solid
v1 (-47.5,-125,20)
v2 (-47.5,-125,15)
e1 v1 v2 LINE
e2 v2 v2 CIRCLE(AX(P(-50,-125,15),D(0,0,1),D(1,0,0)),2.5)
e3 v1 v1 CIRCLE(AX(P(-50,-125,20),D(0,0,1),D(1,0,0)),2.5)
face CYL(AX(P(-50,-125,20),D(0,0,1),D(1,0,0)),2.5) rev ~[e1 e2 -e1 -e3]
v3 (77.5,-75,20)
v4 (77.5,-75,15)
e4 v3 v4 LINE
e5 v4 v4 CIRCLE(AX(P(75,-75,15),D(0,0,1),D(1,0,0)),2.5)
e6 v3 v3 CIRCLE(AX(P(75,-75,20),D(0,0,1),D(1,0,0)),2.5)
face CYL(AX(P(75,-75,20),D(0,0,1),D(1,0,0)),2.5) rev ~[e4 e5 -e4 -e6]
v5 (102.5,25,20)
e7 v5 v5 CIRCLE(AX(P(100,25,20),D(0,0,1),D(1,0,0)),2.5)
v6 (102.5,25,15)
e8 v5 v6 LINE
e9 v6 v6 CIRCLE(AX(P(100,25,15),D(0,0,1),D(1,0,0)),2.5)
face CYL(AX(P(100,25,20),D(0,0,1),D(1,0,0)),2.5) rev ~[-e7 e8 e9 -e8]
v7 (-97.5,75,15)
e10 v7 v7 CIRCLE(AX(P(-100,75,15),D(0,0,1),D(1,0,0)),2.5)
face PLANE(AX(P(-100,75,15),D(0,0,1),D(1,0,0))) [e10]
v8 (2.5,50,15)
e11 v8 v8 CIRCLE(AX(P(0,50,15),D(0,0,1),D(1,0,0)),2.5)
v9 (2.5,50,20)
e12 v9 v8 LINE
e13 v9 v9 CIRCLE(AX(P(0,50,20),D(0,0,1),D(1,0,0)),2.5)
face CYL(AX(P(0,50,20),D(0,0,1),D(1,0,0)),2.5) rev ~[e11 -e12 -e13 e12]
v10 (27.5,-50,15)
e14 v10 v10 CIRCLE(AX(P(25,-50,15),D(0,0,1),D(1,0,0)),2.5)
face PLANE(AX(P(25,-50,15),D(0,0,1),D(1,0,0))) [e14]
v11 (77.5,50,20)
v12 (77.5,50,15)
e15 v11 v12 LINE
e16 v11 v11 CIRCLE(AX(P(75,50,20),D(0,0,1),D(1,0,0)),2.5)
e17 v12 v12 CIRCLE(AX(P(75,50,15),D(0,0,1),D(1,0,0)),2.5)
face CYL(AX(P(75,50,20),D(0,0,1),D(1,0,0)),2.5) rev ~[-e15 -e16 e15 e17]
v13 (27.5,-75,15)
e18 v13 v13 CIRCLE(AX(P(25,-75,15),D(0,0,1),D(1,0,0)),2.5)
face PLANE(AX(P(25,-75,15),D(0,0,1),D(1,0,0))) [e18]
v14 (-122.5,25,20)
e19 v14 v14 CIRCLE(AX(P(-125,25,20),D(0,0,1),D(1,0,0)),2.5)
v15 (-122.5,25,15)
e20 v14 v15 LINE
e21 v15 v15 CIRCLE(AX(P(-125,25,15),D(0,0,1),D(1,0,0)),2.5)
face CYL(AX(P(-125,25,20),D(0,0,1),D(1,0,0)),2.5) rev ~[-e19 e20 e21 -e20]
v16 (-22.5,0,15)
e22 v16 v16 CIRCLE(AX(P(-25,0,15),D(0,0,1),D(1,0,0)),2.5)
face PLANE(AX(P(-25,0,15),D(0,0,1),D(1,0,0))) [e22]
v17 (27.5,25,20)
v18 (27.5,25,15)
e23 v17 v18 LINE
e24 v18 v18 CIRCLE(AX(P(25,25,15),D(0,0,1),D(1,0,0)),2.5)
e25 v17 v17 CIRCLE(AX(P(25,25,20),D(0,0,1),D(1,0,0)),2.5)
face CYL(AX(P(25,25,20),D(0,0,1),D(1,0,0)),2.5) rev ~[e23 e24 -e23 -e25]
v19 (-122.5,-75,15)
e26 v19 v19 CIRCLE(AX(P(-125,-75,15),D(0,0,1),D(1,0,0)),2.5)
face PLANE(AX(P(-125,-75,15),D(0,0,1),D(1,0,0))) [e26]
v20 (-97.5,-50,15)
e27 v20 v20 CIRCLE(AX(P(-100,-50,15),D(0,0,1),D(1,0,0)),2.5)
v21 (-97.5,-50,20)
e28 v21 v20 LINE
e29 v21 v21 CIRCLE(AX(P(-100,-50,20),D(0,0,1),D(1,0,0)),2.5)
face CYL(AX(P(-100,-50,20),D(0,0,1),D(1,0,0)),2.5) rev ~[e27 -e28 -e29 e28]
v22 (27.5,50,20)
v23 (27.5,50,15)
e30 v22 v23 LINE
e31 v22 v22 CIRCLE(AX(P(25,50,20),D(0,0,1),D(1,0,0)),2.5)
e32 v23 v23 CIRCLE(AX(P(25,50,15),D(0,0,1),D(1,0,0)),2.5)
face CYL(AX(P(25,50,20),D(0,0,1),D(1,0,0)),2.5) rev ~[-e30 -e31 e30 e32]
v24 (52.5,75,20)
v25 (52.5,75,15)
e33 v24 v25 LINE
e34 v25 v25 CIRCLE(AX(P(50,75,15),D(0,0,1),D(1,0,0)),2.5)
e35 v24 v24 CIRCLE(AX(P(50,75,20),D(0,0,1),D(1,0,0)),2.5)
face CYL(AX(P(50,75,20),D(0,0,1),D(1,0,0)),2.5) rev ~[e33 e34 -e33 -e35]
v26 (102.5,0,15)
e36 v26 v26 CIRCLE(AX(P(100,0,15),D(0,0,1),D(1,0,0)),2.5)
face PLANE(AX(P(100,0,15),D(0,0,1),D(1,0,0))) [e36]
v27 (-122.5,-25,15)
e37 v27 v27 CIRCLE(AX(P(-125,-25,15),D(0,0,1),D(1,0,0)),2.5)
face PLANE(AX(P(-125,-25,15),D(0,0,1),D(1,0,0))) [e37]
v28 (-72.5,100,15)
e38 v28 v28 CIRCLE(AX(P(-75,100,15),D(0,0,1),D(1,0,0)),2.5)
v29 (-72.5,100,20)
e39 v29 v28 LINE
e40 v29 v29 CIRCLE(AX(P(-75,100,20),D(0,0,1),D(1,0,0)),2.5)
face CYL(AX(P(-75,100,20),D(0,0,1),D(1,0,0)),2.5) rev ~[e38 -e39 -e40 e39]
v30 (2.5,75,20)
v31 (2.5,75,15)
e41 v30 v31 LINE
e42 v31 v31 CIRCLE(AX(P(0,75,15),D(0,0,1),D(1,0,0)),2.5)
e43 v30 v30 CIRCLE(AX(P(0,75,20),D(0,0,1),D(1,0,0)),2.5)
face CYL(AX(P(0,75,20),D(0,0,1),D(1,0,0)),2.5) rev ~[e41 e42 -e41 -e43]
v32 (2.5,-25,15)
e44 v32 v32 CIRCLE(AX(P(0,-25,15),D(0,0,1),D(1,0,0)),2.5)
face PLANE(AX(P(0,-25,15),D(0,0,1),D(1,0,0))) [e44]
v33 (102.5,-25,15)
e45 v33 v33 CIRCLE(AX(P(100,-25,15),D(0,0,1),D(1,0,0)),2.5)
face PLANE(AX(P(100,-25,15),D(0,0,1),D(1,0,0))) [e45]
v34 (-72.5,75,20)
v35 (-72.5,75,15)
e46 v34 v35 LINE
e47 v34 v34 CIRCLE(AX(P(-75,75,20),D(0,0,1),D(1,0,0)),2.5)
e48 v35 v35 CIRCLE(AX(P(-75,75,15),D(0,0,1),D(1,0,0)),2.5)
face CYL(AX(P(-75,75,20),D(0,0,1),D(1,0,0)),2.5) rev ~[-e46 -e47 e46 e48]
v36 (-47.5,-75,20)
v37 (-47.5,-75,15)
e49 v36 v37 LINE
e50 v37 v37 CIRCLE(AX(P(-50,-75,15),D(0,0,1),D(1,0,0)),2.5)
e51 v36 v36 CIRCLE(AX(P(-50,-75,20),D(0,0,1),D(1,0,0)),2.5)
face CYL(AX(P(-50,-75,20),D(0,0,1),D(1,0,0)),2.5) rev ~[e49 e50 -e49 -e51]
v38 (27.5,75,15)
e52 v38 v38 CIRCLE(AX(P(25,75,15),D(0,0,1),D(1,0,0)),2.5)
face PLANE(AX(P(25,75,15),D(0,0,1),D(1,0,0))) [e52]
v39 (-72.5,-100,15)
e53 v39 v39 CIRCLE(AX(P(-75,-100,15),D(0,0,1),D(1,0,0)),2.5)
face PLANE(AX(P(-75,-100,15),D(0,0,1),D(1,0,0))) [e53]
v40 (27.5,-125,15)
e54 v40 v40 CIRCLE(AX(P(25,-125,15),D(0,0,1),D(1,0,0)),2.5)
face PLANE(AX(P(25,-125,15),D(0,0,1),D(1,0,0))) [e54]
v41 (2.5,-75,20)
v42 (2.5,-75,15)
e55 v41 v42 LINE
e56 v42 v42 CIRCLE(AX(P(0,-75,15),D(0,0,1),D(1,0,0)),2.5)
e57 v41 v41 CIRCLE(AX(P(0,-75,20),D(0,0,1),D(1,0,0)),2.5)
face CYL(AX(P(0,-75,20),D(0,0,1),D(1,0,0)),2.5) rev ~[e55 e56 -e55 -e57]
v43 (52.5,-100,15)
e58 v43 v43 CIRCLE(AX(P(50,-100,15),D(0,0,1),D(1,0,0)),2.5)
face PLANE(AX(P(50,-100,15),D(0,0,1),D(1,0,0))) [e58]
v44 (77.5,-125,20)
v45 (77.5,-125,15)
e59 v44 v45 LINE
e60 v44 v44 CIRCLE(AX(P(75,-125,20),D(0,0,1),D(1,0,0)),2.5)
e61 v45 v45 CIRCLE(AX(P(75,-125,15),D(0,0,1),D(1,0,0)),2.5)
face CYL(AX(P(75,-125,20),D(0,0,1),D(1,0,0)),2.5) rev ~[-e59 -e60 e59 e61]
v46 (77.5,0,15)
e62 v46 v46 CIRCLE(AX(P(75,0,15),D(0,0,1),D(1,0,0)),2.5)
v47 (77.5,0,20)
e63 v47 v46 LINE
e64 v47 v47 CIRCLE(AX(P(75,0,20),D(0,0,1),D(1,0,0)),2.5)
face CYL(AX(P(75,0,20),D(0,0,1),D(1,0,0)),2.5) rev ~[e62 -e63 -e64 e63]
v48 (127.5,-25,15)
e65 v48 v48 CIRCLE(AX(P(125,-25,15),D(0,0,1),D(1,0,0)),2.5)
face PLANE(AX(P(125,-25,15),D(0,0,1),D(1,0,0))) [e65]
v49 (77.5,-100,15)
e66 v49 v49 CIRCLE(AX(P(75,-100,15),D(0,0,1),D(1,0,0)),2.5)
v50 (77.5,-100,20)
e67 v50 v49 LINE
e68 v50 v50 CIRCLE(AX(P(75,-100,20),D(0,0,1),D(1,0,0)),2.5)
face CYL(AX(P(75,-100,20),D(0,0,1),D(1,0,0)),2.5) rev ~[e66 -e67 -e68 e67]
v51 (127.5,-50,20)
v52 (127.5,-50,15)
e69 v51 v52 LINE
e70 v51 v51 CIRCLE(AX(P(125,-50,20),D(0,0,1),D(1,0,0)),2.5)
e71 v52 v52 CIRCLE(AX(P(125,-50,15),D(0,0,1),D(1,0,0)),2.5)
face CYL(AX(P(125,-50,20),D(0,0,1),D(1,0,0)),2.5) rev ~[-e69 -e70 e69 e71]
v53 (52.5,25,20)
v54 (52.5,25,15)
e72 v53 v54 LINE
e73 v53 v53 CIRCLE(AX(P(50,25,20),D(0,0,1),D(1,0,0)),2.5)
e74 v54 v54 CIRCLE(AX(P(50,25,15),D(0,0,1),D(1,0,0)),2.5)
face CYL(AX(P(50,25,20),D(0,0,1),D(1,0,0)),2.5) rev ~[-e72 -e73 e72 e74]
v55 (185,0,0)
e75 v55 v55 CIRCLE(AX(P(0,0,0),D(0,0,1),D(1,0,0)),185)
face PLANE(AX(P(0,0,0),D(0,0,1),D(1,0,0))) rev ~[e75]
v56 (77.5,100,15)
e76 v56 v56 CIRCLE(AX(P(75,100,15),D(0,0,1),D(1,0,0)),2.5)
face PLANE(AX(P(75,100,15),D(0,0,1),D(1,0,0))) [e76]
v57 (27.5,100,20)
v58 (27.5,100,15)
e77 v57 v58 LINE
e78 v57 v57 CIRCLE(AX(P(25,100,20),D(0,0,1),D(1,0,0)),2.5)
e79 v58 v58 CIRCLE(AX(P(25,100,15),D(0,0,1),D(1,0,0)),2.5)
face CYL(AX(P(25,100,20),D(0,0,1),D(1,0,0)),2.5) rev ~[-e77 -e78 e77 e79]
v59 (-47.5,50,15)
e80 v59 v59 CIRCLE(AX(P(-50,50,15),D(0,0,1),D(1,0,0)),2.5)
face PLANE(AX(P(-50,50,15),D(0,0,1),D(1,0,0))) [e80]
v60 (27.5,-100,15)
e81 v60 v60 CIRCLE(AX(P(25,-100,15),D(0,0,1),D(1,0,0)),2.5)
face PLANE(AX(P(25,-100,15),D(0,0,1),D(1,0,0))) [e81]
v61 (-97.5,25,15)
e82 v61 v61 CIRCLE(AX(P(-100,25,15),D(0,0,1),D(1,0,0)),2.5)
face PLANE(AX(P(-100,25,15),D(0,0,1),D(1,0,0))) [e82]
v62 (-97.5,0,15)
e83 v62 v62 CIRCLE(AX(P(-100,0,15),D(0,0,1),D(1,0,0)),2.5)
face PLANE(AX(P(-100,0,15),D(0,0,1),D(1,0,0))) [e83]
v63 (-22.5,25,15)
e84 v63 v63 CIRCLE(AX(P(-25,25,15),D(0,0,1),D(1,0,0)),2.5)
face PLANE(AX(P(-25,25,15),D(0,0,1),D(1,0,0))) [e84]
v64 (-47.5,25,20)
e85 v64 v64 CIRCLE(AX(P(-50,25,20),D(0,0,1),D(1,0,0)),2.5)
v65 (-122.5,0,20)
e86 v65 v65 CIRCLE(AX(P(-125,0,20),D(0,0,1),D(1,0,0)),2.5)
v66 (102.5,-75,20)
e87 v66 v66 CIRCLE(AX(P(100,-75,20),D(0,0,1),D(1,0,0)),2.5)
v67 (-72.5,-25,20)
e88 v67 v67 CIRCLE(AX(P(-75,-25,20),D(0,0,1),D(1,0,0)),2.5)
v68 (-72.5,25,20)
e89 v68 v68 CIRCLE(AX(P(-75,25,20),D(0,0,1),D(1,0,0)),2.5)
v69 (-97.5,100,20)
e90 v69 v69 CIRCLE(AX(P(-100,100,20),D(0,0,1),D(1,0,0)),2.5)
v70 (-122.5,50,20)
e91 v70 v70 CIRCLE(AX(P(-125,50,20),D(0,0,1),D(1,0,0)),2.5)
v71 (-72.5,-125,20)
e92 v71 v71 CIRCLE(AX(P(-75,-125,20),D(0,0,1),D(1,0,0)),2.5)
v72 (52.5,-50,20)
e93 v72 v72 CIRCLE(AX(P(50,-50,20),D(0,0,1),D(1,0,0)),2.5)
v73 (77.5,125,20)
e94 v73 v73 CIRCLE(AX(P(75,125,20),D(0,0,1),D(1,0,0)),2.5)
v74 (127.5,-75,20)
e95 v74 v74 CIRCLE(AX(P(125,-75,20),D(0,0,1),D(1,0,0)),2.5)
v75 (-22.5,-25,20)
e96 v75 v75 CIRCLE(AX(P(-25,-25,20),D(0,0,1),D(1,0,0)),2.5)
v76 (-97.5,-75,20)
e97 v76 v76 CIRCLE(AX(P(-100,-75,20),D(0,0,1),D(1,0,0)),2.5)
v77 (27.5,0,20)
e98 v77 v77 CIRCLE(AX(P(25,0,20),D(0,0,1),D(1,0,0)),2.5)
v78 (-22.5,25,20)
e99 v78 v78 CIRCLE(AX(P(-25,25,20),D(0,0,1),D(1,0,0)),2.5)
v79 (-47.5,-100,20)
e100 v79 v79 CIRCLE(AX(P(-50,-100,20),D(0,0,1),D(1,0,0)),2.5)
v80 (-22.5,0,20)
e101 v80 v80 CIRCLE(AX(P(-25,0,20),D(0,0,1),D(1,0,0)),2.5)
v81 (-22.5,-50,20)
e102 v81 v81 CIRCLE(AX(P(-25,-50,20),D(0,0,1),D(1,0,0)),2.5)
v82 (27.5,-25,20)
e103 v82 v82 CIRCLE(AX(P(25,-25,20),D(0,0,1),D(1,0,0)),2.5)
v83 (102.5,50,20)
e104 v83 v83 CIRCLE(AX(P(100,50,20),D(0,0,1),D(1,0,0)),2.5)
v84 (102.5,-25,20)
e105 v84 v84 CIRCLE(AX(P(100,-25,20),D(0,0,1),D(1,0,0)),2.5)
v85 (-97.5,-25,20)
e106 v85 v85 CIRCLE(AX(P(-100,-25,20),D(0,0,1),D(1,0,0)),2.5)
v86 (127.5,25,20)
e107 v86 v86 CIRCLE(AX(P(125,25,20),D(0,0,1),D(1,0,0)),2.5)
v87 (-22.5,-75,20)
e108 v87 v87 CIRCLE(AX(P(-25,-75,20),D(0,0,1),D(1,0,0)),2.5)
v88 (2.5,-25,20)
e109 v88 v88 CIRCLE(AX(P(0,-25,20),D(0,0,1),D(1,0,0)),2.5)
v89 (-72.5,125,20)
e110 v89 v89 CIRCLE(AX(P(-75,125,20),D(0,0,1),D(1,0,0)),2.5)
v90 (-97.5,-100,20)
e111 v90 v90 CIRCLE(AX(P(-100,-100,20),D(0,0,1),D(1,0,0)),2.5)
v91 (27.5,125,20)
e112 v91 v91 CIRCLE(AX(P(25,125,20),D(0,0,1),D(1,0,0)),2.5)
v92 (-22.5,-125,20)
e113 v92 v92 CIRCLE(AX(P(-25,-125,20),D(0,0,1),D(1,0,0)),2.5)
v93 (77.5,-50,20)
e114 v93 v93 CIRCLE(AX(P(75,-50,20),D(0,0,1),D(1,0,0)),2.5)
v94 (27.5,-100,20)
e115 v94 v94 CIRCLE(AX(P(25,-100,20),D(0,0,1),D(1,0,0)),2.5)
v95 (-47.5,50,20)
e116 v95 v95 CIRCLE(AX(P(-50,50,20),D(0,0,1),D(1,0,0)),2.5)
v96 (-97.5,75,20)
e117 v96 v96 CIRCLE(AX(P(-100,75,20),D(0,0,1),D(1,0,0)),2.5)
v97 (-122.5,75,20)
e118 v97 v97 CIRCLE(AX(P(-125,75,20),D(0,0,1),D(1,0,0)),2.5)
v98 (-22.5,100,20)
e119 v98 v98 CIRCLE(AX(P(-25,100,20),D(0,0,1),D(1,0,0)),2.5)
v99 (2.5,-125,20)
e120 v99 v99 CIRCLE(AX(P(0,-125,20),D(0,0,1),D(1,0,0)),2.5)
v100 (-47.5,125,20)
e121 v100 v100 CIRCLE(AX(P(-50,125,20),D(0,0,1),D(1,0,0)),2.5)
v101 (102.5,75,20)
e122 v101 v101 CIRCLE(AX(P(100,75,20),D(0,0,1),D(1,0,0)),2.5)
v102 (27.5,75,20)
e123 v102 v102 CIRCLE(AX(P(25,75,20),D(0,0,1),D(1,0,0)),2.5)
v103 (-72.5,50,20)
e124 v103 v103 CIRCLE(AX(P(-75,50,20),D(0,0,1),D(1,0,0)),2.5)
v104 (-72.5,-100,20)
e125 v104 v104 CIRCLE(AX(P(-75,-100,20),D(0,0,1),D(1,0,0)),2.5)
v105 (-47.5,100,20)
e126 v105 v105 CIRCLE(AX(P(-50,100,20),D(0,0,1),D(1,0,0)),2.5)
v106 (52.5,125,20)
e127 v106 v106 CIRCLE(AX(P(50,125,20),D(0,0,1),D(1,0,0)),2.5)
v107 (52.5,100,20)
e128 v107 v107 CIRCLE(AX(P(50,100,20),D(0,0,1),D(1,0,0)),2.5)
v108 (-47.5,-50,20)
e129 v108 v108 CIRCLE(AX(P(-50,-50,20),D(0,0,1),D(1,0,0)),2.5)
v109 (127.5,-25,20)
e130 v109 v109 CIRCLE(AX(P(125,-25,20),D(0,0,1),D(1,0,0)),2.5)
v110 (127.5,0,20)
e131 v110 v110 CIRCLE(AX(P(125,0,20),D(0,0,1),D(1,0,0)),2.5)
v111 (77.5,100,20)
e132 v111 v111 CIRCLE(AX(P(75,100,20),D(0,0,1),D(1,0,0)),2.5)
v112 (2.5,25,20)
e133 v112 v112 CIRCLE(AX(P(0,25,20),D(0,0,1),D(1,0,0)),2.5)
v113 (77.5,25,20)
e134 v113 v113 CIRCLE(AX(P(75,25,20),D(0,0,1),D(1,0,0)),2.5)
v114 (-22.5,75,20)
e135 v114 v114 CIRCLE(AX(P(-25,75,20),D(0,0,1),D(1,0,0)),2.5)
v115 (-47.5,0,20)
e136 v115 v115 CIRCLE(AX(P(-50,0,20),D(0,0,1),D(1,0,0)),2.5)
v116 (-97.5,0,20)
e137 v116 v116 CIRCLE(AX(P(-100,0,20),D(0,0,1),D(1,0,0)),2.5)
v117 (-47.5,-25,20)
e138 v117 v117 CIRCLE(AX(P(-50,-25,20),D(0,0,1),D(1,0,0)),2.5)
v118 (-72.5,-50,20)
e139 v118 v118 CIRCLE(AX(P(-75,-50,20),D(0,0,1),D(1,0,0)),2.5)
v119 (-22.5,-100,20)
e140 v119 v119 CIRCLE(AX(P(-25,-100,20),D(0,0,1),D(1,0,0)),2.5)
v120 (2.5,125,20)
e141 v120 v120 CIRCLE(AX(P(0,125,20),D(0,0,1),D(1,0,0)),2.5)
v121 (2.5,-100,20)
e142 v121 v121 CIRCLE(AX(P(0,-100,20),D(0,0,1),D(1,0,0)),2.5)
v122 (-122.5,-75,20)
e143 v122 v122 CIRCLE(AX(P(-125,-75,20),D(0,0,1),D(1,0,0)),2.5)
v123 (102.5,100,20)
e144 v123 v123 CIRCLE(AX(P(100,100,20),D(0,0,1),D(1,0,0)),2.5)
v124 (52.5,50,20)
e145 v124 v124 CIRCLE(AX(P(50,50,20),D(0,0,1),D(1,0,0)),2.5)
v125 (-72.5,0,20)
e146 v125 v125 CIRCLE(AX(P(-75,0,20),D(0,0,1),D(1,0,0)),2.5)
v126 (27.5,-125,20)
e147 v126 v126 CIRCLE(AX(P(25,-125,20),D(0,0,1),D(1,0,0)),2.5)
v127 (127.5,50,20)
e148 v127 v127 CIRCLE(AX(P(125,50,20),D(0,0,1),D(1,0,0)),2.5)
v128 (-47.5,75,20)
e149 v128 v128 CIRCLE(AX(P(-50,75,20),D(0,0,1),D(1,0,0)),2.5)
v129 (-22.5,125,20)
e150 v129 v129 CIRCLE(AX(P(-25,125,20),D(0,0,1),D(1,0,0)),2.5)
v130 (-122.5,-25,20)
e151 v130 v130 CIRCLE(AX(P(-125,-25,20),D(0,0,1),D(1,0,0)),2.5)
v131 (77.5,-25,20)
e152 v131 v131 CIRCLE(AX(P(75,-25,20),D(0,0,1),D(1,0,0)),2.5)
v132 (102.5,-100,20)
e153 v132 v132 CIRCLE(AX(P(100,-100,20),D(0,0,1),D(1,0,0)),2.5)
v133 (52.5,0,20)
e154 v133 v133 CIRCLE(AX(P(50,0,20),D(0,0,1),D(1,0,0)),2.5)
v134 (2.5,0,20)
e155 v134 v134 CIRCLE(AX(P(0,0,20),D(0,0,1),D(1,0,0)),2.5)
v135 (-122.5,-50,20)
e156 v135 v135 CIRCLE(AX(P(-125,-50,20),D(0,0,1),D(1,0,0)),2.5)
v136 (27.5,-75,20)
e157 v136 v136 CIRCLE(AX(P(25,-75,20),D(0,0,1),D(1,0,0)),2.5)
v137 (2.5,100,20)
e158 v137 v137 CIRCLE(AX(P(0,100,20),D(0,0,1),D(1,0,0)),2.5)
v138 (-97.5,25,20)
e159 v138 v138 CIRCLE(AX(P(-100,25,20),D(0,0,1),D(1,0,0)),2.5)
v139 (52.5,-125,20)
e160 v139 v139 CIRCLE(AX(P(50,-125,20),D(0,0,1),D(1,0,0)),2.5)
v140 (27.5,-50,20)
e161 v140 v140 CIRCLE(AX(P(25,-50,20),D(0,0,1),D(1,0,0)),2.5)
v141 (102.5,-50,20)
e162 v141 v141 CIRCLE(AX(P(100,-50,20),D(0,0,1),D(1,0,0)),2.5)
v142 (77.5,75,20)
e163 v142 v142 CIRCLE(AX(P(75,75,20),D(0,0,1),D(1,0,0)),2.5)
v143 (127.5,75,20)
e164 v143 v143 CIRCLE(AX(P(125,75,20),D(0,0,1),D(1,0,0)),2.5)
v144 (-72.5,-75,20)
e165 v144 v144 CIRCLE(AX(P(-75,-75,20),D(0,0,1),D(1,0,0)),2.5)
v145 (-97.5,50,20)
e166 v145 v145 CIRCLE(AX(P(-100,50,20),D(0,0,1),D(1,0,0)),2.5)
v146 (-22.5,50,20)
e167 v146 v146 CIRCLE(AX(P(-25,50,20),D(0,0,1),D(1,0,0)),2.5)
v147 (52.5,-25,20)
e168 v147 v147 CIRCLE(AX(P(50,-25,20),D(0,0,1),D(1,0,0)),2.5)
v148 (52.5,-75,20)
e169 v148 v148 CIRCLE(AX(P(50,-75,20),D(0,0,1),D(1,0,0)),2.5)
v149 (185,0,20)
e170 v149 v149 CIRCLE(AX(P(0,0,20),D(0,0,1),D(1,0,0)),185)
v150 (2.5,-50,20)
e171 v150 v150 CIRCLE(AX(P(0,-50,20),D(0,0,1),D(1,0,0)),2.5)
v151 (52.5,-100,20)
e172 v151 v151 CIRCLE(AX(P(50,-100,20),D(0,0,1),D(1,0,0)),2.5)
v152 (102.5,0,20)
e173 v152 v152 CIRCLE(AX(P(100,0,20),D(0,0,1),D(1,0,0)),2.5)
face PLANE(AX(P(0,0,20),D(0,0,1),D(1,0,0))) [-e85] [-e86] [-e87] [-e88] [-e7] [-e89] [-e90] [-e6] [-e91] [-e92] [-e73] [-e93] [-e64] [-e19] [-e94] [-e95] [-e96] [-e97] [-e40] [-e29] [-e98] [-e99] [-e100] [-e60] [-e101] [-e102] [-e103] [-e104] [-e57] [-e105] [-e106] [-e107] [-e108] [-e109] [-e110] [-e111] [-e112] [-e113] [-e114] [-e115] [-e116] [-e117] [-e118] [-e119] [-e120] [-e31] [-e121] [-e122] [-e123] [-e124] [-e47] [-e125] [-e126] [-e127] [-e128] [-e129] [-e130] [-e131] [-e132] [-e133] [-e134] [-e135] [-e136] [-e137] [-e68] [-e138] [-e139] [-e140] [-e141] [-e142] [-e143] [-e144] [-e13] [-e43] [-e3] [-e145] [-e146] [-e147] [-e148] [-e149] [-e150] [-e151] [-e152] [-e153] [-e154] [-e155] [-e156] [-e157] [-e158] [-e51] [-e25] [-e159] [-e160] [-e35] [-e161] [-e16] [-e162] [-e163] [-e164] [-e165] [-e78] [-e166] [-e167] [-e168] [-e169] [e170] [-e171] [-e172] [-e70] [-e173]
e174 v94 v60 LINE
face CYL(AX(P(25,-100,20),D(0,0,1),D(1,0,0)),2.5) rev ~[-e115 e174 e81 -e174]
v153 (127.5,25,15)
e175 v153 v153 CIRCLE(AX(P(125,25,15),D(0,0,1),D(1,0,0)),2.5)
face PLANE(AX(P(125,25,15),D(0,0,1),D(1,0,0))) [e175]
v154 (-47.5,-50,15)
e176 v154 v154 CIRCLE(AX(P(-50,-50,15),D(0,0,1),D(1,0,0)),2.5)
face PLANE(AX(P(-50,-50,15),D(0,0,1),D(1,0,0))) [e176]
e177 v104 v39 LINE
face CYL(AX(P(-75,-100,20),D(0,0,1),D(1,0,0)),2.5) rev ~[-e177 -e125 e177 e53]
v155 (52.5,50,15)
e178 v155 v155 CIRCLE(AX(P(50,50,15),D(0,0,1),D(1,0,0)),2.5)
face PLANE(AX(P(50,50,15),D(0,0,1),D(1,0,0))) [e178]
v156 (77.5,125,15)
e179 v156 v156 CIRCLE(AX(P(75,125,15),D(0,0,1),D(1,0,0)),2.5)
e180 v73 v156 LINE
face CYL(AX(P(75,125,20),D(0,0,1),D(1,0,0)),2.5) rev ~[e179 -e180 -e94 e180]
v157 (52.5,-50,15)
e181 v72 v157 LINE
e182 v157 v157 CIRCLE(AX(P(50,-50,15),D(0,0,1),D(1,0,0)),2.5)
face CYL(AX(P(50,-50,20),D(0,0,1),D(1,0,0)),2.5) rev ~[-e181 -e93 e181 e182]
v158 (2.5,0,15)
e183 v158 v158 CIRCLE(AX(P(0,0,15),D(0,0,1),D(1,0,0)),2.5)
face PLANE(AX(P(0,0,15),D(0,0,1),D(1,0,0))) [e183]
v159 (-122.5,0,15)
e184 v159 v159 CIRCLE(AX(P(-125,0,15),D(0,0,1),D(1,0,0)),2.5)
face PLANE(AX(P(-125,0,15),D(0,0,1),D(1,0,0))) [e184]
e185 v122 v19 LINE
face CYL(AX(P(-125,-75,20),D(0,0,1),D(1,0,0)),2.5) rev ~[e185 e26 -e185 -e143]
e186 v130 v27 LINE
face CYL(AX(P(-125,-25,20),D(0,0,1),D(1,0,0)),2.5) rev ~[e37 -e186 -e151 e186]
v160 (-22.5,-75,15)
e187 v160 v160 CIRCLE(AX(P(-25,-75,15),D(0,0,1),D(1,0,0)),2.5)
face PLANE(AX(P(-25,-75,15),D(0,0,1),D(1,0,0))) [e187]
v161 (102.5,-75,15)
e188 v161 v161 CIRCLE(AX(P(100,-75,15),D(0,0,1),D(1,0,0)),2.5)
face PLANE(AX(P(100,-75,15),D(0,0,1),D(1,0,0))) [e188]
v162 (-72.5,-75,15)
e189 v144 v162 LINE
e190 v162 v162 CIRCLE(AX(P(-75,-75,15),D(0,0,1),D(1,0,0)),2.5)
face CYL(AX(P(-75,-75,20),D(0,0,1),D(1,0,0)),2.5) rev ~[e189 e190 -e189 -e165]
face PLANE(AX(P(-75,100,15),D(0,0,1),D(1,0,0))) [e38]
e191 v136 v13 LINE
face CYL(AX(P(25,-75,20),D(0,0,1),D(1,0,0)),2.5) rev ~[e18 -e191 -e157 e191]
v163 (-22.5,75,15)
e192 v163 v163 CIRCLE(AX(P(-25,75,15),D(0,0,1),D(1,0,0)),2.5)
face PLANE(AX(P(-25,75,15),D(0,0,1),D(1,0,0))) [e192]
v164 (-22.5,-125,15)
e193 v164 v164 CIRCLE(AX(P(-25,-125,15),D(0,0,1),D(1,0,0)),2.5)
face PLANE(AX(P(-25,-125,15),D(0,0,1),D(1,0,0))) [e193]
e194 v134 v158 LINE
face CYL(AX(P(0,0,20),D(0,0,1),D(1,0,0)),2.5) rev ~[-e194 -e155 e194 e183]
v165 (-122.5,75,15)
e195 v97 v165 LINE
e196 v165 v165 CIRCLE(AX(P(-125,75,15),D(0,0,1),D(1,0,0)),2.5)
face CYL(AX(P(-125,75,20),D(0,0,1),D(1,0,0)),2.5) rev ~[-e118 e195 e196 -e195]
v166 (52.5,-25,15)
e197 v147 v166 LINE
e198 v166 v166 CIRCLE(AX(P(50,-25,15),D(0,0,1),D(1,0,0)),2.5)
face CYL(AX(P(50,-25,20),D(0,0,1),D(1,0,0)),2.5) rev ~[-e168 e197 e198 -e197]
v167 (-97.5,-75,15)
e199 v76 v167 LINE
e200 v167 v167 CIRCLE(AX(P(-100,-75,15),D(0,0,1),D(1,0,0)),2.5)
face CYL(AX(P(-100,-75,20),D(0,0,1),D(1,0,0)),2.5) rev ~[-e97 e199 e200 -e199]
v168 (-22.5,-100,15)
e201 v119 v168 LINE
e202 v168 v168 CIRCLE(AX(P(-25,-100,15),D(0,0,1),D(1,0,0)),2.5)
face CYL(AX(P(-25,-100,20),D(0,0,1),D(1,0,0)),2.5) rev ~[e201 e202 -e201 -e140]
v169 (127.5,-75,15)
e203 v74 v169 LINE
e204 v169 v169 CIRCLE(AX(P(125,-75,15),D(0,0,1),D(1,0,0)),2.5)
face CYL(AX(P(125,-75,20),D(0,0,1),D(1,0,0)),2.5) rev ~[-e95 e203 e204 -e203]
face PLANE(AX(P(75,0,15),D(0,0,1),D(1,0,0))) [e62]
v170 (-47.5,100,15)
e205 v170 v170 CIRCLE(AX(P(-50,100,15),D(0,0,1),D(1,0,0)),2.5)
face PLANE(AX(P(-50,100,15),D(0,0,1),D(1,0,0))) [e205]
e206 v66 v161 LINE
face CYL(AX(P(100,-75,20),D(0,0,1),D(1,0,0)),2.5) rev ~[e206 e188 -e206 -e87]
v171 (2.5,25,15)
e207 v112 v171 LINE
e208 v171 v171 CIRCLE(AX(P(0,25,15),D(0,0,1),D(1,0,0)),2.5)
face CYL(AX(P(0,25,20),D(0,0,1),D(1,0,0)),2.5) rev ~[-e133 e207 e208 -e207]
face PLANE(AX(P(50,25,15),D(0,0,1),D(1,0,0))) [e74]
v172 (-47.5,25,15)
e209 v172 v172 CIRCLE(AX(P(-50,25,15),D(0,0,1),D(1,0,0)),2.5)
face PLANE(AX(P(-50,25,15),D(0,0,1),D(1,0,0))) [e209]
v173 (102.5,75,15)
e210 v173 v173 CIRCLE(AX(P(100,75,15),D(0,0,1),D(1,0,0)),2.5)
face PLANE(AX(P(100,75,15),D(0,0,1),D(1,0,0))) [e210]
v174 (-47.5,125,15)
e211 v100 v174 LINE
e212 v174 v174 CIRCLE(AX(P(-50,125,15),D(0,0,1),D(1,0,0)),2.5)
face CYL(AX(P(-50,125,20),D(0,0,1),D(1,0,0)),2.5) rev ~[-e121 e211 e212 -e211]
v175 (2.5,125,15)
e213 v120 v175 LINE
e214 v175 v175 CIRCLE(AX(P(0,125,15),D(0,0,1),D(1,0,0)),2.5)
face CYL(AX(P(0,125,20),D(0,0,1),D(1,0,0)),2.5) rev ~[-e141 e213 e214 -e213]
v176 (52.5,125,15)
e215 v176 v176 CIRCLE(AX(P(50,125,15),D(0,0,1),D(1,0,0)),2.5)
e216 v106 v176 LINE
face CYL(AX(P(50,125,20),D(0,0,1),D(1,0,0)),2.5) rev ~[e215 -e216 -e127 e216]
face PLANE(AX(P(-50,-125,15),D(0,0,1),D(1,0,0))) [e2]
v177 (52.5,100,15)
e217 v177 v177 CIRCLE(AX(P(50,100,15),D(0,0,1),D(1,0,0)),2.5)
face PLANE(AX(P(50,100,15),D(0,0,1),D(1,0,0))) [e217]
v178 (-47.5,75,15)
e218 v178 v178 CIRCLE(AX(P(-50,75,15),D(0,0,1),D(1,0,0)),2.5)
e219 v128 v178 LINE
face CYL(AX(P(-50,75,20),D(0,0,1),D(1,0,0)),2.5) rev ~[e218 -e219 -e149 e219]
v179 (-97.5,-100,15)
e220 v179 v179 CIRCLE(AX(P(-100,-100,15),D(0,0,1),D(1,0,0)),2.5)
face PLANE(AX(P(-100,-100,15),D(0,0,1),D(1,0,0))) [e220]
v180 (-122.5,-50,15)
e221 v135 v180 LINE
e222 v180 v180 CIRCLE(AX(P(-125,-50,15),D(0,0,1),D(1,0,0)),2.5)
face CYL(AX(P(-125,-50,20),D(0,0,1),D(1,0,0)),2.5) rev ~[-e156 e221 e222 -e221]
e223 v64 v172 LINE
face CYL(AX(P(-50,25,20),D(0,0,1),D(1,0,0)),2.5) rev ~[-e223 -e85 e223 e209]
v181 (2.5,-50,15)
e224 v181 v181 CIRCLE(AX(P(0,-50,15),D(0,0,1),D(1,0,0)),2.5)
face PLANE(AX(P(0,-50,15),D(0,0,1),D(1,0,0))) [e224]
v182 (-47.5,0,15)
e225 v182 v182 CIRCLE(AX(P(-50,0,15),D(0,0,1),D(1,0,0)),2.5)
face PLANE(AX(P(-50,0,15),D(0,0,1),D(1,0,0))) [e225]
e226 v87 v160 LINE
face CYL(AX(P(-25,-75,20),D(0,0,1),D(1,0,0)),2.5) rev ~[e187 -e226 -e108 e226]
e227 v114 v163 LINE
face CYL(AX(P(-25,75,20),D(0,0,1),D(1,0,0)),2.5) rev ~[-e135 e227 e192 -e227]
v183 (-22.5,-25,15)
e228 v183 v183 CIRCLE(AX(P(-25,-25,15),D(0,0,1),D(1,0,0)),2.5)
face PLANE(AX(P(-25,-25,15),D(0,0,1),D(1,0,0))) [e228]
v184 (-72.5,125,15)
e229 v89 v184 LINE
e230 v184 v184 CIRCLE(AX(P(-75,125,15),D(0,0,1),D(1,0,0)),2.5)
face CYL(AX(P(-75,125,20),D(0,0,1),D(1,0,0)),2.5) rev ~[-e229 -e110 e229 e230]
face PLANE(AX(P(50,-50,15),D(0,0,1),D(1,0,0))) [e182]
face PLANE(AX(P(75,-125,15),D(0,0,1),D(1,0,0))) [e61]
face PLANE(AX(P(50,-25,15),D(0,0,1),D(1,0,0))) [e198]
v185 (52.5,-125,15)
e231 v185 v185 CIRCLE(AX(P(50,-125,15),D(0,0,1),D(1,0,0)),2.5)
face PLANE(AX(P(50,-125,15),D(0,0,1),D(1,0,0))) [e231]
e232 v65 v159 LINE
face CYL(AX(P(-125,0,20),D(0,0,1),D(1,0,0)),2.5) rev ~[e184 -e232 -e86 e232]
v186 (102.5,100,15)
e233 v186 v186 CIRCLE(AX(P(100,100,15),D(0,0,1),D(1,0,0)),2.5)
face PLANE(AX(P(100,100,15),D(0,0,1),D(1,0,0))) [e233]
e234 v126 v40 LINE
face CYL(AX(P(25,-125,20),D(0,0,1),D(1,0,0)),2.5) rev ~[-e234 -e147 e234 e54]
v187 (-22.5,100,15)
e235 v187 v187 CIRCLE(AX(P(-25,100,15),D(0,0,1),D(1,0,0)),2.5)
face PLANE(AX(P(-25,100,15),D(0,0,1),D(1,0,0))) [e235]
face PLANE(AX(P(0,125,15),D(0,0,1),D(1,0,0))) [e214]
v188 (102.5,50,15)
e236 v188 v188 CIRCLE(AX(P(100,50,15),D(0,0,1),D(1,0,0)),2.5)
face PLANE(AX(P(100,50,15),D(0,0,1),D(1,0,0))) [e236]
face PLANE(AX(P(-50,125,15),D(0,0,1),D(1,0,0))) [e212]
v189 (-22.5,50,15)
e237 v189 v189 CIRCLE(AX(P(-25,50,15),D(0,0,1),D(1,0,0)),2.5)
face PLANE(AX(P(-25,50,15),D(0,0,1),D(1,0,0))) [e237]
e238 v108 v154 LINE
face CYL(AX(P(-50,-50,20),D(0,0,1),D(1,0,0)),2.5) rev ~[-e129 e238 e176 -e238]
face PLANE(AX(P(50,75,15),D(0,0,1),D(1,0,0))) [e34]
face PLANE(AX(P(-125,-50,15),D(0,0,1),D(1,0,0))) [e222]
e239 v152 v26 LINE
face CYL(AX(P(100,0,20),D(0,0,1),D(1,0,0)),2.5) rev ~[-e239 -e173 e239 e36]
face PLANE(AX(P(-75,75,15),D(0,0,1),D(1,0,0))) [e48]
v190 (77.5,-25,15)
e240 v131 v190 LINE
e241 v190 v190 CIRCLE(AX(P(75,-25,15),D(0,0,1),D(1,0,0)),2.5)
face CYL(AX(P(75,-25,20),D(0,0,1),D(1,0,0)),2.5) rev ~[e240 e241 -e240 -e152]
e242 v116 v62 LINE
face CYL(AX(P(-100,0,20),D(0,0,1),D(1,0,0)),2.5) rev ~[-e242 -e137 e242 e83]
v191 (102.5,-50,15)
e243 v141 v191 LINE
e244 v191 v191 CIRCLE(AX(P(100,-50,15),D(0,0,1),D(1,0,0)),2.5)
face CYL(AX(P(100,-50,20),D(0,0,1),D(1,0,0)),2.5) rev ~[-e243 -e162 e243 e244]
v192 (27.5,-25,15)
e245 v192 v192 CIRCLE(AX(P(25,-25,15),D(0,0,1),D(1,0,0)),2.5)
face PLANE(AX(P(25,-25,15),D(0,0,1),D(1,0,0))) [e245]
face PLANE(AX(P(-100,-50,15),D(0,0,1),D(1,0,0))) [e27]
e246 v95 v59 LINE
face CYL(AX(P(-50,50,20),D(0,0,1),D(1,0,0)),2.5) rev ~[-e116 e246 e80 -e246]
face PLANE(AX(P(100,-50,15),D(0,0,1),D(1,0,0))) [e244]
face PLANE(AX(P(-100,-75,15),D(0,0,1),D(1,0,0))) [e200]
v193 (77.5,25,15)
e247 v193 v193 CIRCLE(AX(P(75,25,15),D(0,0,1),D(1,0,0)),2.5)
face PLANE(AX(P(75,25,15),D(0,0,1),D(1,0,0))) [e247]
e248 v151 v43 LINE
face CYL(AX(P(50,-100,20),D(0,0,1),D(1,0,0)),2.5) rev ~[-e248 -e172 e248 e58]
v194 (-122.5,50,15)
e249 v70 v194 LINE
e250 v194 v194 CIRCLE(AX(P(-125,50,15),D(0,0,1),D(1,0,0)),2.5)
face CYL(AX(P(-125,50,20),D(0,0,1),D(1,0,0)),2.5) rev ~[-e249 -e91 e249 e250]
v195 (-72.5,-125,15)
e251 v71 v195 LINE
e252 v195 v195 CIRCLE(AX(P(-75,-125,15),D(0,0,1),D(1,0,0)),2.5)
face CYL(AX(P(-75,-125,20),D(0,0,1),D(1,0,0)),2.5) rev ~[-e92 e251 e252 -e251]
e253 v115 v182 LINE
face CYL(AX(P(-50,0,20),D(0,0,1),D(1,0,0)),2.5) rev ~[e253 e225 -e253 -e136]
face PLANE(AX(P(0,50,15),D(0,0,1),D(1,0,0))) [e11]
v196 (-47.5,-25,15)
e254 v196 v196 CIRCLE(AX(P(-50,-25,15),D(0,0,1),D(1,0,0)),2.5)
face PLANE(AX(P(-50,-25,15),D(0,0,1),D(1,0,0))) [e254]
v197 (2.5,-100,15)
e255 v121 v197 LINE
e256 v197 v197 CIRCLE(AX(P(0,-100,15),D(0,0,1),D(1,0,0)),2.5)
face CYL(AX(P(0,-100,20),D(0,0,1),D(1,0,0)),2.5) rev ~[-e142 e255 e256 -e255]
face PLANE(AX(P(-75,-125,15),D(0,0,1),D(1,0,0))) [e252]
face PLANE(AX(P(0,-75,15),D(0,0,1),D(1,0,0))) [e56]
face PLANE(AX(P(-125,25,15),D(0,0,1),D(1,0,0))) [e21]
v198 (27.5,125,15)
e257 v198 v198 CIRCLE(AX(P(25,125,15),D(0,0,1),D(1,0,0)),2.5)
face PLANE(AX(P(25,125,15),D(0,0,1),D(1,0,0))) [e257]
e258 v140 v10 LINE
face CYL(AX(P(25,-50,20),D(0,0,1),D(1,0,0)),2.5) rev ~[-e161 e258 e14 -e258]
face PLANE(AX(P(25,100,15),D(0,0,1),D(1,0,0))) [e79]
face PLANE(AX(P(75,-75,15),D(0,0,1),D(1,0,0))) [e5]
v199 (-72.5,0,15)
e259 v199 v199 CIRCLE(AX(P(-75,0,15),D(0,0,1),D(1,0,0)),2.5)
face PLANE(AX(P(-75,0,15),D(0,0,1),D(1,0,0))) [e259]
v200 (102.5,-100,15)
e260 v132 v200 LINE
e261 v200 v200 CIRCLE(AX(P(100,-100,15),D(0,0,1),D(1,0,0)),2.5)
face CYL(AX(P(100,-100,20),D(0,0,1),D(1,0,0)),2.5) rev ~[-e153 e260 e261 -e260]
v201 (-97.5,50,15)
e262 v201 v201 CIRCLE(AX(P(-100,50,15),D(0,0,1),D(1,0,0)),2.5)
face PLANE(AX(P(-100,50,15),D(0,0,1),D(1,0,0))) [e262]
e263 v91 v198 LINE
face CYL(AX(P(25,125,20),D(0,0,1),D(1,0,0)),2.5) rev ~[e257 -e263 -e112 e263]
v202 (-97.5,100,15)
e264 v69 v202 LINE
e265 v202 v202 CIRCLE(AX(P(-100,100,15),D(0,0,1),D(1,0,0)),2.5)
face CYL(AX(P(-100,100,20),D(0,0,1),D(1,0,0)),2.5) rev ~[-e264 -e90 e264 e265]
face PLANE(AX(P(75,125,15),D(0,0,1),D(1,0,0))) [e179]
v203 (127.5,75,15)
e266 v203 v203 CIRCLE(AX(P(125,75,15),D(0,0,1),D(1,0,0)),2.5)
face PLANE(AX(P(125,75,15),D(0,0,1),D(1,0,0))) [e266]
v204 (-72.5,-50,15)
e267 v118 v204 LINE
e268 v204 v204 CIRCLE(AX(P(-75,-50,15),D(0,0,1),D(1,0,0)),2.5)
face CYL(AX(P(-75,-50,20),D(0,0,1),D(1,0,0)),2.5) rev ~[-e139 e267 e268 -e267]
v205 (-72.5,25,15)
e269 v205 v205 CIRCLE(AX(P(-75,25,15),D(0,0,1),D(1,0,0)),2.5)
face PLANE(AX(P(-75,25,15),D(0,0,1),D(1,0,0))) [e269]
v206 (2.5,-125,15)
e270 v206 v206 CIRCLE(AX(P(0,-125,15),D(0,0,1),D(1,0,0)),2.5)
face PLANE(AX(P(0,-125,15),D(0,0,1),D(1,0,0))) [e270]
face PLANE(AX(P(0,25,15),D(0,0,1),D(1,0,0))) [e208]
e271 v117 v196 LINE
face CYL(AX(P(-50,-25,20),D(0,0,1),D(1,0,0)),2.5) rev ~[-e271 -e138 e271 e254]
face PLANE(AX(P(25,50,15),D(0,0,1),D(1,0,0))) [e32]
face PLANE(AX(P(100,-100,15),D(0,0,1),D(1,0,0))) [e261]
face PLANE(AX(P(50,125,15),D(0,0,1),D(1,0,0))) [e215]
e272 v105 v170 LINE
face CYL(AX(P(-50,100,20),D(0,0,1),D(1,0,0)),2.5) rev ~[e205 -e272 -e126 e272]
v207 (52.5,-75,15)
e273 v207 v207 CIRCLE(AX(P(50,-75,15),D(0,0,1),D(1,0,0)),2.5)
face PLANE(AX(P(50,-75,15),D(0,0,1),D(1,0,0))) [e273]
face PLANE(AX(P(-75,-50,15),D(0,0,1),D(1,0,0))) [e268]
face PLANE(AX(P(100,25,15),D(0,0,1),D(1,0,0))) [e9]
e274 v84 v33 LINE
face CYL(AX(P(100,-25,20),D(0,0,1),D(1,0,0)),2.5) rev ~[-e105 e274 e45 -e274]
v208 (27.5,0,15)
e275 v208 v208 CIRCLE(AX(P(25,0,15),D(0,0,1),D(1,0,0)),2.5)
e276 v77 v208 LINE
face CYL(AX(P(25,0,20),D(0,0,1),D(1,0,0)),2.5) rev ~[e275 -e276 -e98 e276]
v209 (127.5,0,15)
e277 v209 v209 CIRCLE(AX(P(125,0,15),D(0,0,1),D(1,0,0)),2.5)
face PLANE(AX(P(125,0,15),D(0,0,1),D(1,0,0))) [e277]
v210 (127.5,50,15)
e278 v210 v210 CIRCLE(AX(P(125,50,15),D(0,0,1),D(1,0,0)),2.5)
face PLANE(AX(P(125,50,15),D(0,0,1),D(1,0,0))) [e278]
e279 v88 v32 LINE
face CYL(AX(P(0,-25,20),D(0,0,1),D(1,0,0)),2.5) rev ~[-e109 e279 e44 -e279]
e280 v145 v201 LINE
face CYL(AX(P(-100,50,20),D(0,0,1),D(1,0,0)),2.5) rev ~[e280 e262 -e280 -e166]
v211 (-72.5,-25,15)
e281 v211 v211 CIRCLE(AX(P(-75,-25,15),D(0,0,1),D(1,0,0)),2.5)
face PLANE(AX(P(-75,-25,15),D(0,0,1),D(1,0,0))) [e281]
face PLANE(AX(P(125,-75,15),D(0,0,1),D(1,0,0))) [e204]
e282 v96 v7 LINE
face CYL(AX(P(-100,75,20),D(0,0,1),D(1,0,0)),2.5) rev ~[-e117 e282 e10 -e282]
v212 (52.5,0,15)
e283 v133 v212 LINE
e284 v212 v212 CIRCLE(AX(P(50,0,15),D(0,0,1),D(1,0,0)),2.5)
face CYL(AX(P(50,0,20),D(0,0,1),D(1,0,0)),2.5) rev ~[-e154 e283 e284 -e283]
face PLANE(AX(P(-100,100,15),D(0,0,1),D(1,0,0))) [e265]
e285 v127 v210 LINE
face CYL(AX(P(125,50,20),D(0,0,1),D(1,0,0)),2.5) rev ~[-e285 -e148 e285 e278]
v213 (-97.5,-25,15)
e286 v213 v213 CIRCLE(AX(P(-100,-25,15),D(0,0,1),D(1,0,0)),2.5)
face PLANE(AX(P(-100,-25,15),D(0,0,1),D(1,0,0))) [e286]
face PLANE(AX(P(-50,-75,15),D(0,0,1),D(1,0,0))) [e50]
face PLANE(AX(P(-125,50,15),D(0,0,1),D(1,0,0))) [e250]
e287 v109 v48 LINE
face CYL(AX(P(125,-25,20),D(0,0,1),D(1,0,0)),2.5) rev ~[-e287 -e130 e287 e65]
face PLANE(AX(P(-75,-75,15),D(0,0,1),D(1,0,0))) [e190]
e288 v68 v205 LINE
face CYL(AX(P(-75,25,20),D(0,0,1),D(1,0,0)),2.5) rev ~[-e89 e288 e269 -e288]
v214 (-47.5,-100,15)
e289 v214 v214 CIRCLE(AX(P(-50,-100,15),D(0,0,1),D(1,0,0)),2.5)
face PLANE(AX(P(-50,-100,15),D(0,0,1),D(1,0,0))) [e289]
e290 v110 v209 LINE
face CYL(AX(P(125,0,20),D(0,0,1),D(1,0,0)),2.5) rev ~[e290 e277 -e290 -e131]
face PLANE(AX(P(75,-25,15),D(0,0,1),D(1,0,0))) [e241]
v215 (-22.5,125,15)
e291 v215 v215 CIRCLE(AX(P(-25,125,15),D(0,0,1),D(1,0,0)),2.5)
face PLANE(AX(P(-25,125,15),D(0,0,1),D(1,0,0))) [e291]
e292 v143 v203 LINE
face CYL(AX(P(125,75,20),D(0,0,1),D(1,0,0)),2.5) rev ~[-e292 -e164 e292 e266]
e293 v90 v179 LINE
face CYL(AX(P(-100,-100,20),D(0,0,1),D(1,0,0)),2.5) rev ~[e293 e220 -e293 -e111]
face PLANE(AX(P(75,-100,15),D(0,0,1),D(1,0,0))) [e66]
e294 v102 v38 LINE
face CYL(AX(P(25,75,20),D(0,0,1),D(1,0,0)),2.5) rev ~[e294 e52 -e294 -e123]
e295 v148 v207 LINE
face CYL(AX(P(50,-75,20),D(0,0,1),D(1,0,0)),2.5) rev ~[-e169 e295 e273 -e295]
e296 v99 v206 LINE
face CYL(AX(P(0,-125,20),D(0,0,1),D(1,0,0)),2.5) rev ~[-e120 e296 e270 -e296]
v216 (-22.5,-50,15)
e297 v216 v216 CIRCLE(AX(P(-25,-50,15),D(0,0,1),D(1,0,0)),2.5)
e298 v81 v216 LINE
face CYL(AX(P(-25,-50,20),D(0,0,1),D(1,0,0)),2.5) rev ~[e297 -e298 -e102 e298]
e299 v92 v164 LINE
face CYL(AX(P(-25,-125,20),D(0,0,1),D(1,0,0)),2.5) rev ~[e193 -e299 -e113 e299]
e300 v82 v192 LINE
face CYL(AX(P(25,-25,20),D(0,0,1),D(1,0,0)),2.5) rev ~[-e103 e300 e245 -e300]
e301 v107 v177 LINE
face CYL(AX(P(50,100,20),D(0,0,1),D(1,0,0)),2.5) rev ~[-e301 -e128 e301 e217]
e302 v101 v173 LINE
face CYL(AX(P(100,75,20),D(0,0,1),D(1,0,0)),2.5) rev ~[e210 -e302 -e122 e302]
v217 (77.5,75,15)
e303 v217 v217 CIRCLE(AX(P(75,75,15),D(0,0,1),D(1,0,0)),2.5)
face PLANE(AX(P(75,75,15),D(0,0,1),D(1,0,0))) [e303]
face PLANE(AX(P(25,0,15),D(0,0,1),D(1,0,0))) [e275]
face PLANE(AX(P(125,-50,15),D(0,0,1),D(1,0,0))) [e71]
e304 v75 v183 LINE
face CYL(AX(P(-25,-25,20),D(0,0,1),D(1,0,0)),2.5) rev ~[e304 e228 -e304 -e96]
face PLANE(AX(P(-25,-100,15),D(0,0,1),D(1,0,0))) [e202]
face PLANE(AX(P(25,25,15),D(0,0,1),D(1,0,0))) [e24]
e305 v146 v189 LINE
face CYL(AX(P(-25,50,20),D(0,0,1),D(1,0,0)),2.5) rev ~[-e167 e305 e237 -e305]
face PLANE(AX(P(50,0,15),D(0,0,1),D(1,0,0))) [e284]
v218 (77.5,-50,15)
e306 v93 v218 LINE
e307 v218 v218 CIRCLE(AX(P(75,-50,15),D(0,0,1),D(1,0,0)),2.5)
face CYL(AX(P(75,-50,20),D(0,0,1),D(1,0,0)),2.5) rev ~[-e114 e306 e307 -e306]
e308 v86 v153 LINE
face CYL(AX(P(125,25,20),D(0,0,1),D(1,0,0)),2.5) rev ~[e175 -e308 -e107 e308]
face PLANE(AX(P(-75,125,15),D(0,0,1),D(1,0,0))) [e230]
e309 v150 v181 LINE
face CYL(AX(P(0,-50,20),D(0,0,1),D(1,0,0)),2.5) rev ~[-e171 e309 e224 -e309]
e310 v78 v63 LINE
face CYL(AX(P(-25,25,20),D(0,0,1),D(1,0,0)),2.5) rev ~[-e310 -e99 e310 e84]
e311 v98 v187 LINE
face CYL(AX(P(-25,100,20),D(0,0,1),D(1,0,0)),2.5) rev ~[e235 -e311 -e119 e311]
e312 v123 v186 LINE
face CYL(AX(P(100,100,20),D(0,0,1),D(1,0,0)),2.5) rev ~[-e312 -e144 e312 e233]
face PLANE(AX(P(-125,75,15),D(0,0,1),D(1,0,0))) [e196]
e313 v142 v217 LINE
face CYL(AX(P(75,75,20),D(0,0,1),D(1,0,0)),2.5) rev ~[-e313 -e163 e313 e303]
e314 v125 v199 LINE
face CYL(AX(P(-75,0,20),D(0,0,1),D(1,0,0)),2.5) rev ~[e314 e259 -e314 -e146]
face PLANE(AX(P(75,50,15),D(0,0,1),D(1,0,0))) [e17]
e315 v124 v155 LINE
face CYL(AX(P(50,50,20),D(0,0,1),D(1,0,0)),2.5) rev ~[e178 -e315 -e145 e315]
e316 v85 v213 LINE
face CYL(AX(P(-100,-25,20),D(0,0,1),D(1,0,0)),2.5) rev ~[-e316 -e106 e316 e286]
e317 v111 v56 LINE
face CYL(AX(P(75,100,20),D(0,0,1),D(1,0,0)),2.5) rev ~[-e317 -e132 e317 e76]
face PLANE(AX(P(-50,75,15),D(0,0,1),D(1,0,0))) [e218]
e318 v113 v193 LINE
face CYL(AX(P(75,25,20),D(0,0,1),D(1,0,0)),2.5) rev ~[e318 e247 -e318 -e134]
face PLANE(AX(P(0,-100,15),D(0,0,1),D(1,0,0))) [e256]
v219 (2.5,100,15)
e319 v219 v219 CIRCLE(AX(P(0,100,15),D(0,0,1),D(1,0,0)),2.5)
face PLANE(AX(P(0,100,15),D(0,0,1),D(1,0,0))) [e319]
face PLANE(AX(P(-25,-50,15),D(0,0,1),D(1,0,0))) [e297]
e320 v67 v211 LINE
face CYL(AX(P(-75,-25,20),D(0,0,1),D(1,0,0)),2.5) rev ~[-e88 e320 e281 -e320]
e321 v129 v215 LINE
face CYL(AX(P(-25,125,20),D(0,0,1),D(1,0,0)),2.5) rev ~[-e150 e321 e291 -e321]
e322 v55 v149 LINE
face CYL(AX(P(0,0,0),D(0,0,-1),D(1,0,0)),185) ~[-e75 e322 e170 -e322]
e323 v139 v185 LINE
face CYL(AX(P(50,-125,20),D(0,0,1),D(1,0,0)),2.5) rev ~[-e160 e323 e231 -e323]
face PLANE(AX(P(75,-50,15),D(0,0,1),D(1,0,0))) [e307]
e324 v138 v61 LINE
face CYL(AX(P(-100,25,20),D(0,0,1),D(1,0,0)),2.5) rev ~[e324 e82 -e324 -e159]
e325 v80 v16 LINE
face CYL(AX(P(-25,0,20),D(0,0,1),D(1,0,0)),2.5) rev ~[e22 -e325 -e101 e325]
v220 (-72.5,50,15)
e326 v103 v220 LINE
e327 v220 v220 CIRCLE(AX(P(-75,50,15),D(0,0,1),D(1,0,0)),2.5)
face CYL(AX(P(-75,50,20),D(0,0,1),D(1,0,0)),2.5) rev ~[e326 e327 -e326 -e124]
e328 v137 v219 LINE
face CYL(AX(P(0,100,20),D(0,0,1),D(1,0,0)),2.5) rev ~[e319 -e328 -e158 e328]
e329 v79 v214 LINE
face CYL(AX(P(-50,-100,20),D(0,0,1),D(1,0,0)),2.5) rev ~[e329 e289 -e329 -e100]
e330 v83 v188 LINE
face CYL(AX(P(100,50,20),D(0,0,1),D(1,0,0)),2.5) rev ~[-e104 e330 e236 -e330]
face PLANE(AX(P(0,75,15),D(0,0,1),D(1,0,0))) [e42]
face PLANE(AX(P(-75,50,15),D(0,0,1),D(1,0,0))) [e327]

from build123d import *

# Parameters (mm, degrees)
F0_R     = 185
F1_DEPTH = 20
F4_R     = 2.5
F5_DEPTH = 5


# Not quite as in the source:
# - the program builds the solid bodies; features that only make, move or delete a surface that nothing else refers to are left out


with BuildPart() as f1:
    # F0 (on Top) → F1 (new body)
    with BuildSketch(Plane.XY):
        Circle(F0_R)
    extrude(amount=F1_DEPTH)

    # F4 (on face) → F5 (cut)
    with BuildSketch(Plane.XY.offset(20)):
        Circle(F4_R)
        with Locations((0, 25)):
            Circle(F4_R)
        with Locations((0, 50)):
            Circle(F4_R)
        with Locations((0, 75)):
            Circle(F4_R)
        with Locations((0, 100)):
            Circle(F4_R)
        with Locations((0, 125)):
            Circle(F4_R)
        with Locations((25, 0)):
            Circle(F4_R)
        with Locations((25, 25)):
            Circle(F4_R)
        with Locations((25, 50)):
            Circle(F4_R)
        with Locations((25, 75)):
            Circle(F4_R)
        with Locations((25, 100)):
            Circle(F4_R)
        with Locations((25, 125)):
            Circle(F4_R)
        with Locations((50, 0)):
            Circle(F4_R)
        with Locations((50, 25)):
            Circle(F4_R)
        with Locations((50, 50)):
            Circle(F4_R)
        with Locations((50, 75)):
            Circle(F4_R)
        with Locations((50, 100)):
            Circle(F4_R)
        with Locations((50, 125)):
            Circle(F4_R)
        with Locations((75, 0)):
            Circle(F4_R)
        with Locations((75, 25)):
            Circle(F4_R)
        with Locations((75, 50)):
            Circle(F4_R)
        with Locations((75, 75)):
            Circle(F4_R)
        with Locations((75, 100)):
            Circle(F4_R)
        with Locations((75, 125)):
            Circle(F4_R)
        with Locations((100, 0)):
            Circle(F4_R)
        with Locations((100, 25)):
            Circle(F4_R)
        with Locations((100, 50)):
            Circle(F4_R)
        with Locations((100, 75)):
            Circle(F4_R)
        with Locations((100, 100)):
            Circle(F4_R)
        with Locations((125, 0)):
            Circle(F4_R)
        with Locations((125, 25)):
            Circle(F4_R)
        with Locations((125, 50)):
            Circle(F4_R)
        with Locations((125, 75)):
            Circle(F4_R)
        with Locations((75, -25)):
            Circle(F4_R)
        with Locations((100, -50)):
            Circle(F4_R)
        with Locations((0, -100)):
            Circle(F4_R)
        with Locations((100, -100)):
            Circle(F4_R)
        with Locations((75, -100)):
            Circle(F4_R)
        with Locations((125, -50)):
            Circle(F4_R)
        with Locations((75, -125)):
            Circle(F4_R)
        with Locations((25, -50)):
            Circle(F4_R)
        with Locations((0, -75)):
            Circle(F4_R)
        with Locations((100, -75)):
            Circle(F4_R)
        with Locations((100, -25)):
            Circle(F4_R)
        with Locations((50, -125)):
            Circle(F4_R)
        with Locations((125, -25)):
            Circle(F4_R)
        with Locations((50, -75)):
            Circle(F4_R)
        with Locations((25, -25)):
            Circle(F4_R)
        with Locations((75, -75)):
            Circle(F4_R)
        with Locations((75, -50)):
            Circle(F4_R)
        with Locations((125, -75)):
            Circle(F4_R)
        with Locations((0, -125)):
            Circle(F4_R)
        with Locations((25, -75)):
            Circle(F4_R)
        with Locations((50, -100)):
            Circle(F4_R)
        with Locations((25, -125)):
            Circle(F4_R)
        with Locations((0, -50)):
            Circle(F4_R)
        with Locations((25, -100)):
            Circle(F4_R)
        with Locations((50, -25)):
            Circle(F4_R)
        with Locations((50, -50)):
            Circle(F4_R)
        with Locations((0, -25)):
            Circle(F4_R)
        with Locations((-25, -75)):
            Circle(F4_R)
        with Locations((-50, -100)):
            Circle(F4_R)
        with Locations((-100, 0)):
            Circle(F4_R)
        with Locations((-100, -100)):
            Circle(F4_R)
        with Locations((-100, -75)):
            Circle(F4_R)
        with Locations((-50, -125)):
            Circle(F4_R)
        with Locations((-125, -75)):
            Circle(F4_R)
        with Locations((-50, -25)):
            Circle(F4_R)
        with Locations((-75, 0)):
            Circle(F4_R)
        with Locations((-75, -100)):
            Circle(F4_R)
        with Locations((-25, -100)):
            Circle(F4_R)
        with Locations((-125, -50)):
            Circle(F4_R)
        with Locations((-25, -125)):
            Circle(F4_R)
        with Locations((-75, -50)):
            Circle(F4_R)
        with Locations((-25, -25)):
            Circle(F4_R)
        with Locations((-75, -75)):
            Circle(F4_R)
        with Locations((-50, -75)):
            Circle(F4_R)
        with Locations((-75, -125)):
            Circle(F4_R)
        with Locations((-125, 0)):
            Circle(F4_R)
        with Locations((-75, -25)):
            Circle(F4_R)
        with Locations((-100, -50)):
            Circle(F4_R)
        with Locations((-125, -25)):
            Circle(F4_R)
        with Locations((-50, 0)):
            Circle(F4_R)
        with Locations((-100, -25)):
            Circle(F4_R)
        with Locations((-25, -50)):
            Circle(F4_R)
        with Locations((-50, -50)):
            Circle(F4_R)
        with Locations((-25, 0)):
            Circle(F4_R)
        with Locations((-75, 25)):
            Circle(F4_R)
        with Locations((-100, 50)):
            Circle(F4_R)
        with Locations((-100, 100)):
            Circle(F4_R)
        with Locations((-75, 100)):
            Circle(F4_R)
        with Locations((-125, 50)):
            Circle(F4_R)
        with Locations((-75, 125)):
            Circle(F4_R)
        with Locations((-25, 50)):
            Circle(F4_R)
        with Locations((-100, 75)):
            Circle(F4_R)
        with Locations((-100, 25)):
            Circle(F4_R)
        with Locations((-50, 125)):
            Circle(F4_R)
        with Locations((-125, 25)):
            Circle(F4_R)
        with Locations((-50, 75)):
            Circle(F4_R)
        with Locations((-25, 25)):
            Circle(F4_R)
        with Locations((-75, 75)):
            Circle(F4_R)
        with Locations((-75, 50)):
            Circle(F4_R)
        with Locations((-125, 75)):
            Circle(F4_R)
        with Locations((-25, 75)):
            Circle(F4_R)
        with Locations((-50, 100)):
            Circle(F4_R)
        with Locations((-25, 125)):
            Circle(F4_R)
        with Locations((-25, 100)):
            Circle(F4_R)
        with Locations((-50, 25)):
            Circle(F4_R)
        with Locations((-50, 50)):
            Circle(F4_R)
    extrude(amount=-F5_DEPTH, mode=Mode.SUBTRACT)


solid = f1.part
